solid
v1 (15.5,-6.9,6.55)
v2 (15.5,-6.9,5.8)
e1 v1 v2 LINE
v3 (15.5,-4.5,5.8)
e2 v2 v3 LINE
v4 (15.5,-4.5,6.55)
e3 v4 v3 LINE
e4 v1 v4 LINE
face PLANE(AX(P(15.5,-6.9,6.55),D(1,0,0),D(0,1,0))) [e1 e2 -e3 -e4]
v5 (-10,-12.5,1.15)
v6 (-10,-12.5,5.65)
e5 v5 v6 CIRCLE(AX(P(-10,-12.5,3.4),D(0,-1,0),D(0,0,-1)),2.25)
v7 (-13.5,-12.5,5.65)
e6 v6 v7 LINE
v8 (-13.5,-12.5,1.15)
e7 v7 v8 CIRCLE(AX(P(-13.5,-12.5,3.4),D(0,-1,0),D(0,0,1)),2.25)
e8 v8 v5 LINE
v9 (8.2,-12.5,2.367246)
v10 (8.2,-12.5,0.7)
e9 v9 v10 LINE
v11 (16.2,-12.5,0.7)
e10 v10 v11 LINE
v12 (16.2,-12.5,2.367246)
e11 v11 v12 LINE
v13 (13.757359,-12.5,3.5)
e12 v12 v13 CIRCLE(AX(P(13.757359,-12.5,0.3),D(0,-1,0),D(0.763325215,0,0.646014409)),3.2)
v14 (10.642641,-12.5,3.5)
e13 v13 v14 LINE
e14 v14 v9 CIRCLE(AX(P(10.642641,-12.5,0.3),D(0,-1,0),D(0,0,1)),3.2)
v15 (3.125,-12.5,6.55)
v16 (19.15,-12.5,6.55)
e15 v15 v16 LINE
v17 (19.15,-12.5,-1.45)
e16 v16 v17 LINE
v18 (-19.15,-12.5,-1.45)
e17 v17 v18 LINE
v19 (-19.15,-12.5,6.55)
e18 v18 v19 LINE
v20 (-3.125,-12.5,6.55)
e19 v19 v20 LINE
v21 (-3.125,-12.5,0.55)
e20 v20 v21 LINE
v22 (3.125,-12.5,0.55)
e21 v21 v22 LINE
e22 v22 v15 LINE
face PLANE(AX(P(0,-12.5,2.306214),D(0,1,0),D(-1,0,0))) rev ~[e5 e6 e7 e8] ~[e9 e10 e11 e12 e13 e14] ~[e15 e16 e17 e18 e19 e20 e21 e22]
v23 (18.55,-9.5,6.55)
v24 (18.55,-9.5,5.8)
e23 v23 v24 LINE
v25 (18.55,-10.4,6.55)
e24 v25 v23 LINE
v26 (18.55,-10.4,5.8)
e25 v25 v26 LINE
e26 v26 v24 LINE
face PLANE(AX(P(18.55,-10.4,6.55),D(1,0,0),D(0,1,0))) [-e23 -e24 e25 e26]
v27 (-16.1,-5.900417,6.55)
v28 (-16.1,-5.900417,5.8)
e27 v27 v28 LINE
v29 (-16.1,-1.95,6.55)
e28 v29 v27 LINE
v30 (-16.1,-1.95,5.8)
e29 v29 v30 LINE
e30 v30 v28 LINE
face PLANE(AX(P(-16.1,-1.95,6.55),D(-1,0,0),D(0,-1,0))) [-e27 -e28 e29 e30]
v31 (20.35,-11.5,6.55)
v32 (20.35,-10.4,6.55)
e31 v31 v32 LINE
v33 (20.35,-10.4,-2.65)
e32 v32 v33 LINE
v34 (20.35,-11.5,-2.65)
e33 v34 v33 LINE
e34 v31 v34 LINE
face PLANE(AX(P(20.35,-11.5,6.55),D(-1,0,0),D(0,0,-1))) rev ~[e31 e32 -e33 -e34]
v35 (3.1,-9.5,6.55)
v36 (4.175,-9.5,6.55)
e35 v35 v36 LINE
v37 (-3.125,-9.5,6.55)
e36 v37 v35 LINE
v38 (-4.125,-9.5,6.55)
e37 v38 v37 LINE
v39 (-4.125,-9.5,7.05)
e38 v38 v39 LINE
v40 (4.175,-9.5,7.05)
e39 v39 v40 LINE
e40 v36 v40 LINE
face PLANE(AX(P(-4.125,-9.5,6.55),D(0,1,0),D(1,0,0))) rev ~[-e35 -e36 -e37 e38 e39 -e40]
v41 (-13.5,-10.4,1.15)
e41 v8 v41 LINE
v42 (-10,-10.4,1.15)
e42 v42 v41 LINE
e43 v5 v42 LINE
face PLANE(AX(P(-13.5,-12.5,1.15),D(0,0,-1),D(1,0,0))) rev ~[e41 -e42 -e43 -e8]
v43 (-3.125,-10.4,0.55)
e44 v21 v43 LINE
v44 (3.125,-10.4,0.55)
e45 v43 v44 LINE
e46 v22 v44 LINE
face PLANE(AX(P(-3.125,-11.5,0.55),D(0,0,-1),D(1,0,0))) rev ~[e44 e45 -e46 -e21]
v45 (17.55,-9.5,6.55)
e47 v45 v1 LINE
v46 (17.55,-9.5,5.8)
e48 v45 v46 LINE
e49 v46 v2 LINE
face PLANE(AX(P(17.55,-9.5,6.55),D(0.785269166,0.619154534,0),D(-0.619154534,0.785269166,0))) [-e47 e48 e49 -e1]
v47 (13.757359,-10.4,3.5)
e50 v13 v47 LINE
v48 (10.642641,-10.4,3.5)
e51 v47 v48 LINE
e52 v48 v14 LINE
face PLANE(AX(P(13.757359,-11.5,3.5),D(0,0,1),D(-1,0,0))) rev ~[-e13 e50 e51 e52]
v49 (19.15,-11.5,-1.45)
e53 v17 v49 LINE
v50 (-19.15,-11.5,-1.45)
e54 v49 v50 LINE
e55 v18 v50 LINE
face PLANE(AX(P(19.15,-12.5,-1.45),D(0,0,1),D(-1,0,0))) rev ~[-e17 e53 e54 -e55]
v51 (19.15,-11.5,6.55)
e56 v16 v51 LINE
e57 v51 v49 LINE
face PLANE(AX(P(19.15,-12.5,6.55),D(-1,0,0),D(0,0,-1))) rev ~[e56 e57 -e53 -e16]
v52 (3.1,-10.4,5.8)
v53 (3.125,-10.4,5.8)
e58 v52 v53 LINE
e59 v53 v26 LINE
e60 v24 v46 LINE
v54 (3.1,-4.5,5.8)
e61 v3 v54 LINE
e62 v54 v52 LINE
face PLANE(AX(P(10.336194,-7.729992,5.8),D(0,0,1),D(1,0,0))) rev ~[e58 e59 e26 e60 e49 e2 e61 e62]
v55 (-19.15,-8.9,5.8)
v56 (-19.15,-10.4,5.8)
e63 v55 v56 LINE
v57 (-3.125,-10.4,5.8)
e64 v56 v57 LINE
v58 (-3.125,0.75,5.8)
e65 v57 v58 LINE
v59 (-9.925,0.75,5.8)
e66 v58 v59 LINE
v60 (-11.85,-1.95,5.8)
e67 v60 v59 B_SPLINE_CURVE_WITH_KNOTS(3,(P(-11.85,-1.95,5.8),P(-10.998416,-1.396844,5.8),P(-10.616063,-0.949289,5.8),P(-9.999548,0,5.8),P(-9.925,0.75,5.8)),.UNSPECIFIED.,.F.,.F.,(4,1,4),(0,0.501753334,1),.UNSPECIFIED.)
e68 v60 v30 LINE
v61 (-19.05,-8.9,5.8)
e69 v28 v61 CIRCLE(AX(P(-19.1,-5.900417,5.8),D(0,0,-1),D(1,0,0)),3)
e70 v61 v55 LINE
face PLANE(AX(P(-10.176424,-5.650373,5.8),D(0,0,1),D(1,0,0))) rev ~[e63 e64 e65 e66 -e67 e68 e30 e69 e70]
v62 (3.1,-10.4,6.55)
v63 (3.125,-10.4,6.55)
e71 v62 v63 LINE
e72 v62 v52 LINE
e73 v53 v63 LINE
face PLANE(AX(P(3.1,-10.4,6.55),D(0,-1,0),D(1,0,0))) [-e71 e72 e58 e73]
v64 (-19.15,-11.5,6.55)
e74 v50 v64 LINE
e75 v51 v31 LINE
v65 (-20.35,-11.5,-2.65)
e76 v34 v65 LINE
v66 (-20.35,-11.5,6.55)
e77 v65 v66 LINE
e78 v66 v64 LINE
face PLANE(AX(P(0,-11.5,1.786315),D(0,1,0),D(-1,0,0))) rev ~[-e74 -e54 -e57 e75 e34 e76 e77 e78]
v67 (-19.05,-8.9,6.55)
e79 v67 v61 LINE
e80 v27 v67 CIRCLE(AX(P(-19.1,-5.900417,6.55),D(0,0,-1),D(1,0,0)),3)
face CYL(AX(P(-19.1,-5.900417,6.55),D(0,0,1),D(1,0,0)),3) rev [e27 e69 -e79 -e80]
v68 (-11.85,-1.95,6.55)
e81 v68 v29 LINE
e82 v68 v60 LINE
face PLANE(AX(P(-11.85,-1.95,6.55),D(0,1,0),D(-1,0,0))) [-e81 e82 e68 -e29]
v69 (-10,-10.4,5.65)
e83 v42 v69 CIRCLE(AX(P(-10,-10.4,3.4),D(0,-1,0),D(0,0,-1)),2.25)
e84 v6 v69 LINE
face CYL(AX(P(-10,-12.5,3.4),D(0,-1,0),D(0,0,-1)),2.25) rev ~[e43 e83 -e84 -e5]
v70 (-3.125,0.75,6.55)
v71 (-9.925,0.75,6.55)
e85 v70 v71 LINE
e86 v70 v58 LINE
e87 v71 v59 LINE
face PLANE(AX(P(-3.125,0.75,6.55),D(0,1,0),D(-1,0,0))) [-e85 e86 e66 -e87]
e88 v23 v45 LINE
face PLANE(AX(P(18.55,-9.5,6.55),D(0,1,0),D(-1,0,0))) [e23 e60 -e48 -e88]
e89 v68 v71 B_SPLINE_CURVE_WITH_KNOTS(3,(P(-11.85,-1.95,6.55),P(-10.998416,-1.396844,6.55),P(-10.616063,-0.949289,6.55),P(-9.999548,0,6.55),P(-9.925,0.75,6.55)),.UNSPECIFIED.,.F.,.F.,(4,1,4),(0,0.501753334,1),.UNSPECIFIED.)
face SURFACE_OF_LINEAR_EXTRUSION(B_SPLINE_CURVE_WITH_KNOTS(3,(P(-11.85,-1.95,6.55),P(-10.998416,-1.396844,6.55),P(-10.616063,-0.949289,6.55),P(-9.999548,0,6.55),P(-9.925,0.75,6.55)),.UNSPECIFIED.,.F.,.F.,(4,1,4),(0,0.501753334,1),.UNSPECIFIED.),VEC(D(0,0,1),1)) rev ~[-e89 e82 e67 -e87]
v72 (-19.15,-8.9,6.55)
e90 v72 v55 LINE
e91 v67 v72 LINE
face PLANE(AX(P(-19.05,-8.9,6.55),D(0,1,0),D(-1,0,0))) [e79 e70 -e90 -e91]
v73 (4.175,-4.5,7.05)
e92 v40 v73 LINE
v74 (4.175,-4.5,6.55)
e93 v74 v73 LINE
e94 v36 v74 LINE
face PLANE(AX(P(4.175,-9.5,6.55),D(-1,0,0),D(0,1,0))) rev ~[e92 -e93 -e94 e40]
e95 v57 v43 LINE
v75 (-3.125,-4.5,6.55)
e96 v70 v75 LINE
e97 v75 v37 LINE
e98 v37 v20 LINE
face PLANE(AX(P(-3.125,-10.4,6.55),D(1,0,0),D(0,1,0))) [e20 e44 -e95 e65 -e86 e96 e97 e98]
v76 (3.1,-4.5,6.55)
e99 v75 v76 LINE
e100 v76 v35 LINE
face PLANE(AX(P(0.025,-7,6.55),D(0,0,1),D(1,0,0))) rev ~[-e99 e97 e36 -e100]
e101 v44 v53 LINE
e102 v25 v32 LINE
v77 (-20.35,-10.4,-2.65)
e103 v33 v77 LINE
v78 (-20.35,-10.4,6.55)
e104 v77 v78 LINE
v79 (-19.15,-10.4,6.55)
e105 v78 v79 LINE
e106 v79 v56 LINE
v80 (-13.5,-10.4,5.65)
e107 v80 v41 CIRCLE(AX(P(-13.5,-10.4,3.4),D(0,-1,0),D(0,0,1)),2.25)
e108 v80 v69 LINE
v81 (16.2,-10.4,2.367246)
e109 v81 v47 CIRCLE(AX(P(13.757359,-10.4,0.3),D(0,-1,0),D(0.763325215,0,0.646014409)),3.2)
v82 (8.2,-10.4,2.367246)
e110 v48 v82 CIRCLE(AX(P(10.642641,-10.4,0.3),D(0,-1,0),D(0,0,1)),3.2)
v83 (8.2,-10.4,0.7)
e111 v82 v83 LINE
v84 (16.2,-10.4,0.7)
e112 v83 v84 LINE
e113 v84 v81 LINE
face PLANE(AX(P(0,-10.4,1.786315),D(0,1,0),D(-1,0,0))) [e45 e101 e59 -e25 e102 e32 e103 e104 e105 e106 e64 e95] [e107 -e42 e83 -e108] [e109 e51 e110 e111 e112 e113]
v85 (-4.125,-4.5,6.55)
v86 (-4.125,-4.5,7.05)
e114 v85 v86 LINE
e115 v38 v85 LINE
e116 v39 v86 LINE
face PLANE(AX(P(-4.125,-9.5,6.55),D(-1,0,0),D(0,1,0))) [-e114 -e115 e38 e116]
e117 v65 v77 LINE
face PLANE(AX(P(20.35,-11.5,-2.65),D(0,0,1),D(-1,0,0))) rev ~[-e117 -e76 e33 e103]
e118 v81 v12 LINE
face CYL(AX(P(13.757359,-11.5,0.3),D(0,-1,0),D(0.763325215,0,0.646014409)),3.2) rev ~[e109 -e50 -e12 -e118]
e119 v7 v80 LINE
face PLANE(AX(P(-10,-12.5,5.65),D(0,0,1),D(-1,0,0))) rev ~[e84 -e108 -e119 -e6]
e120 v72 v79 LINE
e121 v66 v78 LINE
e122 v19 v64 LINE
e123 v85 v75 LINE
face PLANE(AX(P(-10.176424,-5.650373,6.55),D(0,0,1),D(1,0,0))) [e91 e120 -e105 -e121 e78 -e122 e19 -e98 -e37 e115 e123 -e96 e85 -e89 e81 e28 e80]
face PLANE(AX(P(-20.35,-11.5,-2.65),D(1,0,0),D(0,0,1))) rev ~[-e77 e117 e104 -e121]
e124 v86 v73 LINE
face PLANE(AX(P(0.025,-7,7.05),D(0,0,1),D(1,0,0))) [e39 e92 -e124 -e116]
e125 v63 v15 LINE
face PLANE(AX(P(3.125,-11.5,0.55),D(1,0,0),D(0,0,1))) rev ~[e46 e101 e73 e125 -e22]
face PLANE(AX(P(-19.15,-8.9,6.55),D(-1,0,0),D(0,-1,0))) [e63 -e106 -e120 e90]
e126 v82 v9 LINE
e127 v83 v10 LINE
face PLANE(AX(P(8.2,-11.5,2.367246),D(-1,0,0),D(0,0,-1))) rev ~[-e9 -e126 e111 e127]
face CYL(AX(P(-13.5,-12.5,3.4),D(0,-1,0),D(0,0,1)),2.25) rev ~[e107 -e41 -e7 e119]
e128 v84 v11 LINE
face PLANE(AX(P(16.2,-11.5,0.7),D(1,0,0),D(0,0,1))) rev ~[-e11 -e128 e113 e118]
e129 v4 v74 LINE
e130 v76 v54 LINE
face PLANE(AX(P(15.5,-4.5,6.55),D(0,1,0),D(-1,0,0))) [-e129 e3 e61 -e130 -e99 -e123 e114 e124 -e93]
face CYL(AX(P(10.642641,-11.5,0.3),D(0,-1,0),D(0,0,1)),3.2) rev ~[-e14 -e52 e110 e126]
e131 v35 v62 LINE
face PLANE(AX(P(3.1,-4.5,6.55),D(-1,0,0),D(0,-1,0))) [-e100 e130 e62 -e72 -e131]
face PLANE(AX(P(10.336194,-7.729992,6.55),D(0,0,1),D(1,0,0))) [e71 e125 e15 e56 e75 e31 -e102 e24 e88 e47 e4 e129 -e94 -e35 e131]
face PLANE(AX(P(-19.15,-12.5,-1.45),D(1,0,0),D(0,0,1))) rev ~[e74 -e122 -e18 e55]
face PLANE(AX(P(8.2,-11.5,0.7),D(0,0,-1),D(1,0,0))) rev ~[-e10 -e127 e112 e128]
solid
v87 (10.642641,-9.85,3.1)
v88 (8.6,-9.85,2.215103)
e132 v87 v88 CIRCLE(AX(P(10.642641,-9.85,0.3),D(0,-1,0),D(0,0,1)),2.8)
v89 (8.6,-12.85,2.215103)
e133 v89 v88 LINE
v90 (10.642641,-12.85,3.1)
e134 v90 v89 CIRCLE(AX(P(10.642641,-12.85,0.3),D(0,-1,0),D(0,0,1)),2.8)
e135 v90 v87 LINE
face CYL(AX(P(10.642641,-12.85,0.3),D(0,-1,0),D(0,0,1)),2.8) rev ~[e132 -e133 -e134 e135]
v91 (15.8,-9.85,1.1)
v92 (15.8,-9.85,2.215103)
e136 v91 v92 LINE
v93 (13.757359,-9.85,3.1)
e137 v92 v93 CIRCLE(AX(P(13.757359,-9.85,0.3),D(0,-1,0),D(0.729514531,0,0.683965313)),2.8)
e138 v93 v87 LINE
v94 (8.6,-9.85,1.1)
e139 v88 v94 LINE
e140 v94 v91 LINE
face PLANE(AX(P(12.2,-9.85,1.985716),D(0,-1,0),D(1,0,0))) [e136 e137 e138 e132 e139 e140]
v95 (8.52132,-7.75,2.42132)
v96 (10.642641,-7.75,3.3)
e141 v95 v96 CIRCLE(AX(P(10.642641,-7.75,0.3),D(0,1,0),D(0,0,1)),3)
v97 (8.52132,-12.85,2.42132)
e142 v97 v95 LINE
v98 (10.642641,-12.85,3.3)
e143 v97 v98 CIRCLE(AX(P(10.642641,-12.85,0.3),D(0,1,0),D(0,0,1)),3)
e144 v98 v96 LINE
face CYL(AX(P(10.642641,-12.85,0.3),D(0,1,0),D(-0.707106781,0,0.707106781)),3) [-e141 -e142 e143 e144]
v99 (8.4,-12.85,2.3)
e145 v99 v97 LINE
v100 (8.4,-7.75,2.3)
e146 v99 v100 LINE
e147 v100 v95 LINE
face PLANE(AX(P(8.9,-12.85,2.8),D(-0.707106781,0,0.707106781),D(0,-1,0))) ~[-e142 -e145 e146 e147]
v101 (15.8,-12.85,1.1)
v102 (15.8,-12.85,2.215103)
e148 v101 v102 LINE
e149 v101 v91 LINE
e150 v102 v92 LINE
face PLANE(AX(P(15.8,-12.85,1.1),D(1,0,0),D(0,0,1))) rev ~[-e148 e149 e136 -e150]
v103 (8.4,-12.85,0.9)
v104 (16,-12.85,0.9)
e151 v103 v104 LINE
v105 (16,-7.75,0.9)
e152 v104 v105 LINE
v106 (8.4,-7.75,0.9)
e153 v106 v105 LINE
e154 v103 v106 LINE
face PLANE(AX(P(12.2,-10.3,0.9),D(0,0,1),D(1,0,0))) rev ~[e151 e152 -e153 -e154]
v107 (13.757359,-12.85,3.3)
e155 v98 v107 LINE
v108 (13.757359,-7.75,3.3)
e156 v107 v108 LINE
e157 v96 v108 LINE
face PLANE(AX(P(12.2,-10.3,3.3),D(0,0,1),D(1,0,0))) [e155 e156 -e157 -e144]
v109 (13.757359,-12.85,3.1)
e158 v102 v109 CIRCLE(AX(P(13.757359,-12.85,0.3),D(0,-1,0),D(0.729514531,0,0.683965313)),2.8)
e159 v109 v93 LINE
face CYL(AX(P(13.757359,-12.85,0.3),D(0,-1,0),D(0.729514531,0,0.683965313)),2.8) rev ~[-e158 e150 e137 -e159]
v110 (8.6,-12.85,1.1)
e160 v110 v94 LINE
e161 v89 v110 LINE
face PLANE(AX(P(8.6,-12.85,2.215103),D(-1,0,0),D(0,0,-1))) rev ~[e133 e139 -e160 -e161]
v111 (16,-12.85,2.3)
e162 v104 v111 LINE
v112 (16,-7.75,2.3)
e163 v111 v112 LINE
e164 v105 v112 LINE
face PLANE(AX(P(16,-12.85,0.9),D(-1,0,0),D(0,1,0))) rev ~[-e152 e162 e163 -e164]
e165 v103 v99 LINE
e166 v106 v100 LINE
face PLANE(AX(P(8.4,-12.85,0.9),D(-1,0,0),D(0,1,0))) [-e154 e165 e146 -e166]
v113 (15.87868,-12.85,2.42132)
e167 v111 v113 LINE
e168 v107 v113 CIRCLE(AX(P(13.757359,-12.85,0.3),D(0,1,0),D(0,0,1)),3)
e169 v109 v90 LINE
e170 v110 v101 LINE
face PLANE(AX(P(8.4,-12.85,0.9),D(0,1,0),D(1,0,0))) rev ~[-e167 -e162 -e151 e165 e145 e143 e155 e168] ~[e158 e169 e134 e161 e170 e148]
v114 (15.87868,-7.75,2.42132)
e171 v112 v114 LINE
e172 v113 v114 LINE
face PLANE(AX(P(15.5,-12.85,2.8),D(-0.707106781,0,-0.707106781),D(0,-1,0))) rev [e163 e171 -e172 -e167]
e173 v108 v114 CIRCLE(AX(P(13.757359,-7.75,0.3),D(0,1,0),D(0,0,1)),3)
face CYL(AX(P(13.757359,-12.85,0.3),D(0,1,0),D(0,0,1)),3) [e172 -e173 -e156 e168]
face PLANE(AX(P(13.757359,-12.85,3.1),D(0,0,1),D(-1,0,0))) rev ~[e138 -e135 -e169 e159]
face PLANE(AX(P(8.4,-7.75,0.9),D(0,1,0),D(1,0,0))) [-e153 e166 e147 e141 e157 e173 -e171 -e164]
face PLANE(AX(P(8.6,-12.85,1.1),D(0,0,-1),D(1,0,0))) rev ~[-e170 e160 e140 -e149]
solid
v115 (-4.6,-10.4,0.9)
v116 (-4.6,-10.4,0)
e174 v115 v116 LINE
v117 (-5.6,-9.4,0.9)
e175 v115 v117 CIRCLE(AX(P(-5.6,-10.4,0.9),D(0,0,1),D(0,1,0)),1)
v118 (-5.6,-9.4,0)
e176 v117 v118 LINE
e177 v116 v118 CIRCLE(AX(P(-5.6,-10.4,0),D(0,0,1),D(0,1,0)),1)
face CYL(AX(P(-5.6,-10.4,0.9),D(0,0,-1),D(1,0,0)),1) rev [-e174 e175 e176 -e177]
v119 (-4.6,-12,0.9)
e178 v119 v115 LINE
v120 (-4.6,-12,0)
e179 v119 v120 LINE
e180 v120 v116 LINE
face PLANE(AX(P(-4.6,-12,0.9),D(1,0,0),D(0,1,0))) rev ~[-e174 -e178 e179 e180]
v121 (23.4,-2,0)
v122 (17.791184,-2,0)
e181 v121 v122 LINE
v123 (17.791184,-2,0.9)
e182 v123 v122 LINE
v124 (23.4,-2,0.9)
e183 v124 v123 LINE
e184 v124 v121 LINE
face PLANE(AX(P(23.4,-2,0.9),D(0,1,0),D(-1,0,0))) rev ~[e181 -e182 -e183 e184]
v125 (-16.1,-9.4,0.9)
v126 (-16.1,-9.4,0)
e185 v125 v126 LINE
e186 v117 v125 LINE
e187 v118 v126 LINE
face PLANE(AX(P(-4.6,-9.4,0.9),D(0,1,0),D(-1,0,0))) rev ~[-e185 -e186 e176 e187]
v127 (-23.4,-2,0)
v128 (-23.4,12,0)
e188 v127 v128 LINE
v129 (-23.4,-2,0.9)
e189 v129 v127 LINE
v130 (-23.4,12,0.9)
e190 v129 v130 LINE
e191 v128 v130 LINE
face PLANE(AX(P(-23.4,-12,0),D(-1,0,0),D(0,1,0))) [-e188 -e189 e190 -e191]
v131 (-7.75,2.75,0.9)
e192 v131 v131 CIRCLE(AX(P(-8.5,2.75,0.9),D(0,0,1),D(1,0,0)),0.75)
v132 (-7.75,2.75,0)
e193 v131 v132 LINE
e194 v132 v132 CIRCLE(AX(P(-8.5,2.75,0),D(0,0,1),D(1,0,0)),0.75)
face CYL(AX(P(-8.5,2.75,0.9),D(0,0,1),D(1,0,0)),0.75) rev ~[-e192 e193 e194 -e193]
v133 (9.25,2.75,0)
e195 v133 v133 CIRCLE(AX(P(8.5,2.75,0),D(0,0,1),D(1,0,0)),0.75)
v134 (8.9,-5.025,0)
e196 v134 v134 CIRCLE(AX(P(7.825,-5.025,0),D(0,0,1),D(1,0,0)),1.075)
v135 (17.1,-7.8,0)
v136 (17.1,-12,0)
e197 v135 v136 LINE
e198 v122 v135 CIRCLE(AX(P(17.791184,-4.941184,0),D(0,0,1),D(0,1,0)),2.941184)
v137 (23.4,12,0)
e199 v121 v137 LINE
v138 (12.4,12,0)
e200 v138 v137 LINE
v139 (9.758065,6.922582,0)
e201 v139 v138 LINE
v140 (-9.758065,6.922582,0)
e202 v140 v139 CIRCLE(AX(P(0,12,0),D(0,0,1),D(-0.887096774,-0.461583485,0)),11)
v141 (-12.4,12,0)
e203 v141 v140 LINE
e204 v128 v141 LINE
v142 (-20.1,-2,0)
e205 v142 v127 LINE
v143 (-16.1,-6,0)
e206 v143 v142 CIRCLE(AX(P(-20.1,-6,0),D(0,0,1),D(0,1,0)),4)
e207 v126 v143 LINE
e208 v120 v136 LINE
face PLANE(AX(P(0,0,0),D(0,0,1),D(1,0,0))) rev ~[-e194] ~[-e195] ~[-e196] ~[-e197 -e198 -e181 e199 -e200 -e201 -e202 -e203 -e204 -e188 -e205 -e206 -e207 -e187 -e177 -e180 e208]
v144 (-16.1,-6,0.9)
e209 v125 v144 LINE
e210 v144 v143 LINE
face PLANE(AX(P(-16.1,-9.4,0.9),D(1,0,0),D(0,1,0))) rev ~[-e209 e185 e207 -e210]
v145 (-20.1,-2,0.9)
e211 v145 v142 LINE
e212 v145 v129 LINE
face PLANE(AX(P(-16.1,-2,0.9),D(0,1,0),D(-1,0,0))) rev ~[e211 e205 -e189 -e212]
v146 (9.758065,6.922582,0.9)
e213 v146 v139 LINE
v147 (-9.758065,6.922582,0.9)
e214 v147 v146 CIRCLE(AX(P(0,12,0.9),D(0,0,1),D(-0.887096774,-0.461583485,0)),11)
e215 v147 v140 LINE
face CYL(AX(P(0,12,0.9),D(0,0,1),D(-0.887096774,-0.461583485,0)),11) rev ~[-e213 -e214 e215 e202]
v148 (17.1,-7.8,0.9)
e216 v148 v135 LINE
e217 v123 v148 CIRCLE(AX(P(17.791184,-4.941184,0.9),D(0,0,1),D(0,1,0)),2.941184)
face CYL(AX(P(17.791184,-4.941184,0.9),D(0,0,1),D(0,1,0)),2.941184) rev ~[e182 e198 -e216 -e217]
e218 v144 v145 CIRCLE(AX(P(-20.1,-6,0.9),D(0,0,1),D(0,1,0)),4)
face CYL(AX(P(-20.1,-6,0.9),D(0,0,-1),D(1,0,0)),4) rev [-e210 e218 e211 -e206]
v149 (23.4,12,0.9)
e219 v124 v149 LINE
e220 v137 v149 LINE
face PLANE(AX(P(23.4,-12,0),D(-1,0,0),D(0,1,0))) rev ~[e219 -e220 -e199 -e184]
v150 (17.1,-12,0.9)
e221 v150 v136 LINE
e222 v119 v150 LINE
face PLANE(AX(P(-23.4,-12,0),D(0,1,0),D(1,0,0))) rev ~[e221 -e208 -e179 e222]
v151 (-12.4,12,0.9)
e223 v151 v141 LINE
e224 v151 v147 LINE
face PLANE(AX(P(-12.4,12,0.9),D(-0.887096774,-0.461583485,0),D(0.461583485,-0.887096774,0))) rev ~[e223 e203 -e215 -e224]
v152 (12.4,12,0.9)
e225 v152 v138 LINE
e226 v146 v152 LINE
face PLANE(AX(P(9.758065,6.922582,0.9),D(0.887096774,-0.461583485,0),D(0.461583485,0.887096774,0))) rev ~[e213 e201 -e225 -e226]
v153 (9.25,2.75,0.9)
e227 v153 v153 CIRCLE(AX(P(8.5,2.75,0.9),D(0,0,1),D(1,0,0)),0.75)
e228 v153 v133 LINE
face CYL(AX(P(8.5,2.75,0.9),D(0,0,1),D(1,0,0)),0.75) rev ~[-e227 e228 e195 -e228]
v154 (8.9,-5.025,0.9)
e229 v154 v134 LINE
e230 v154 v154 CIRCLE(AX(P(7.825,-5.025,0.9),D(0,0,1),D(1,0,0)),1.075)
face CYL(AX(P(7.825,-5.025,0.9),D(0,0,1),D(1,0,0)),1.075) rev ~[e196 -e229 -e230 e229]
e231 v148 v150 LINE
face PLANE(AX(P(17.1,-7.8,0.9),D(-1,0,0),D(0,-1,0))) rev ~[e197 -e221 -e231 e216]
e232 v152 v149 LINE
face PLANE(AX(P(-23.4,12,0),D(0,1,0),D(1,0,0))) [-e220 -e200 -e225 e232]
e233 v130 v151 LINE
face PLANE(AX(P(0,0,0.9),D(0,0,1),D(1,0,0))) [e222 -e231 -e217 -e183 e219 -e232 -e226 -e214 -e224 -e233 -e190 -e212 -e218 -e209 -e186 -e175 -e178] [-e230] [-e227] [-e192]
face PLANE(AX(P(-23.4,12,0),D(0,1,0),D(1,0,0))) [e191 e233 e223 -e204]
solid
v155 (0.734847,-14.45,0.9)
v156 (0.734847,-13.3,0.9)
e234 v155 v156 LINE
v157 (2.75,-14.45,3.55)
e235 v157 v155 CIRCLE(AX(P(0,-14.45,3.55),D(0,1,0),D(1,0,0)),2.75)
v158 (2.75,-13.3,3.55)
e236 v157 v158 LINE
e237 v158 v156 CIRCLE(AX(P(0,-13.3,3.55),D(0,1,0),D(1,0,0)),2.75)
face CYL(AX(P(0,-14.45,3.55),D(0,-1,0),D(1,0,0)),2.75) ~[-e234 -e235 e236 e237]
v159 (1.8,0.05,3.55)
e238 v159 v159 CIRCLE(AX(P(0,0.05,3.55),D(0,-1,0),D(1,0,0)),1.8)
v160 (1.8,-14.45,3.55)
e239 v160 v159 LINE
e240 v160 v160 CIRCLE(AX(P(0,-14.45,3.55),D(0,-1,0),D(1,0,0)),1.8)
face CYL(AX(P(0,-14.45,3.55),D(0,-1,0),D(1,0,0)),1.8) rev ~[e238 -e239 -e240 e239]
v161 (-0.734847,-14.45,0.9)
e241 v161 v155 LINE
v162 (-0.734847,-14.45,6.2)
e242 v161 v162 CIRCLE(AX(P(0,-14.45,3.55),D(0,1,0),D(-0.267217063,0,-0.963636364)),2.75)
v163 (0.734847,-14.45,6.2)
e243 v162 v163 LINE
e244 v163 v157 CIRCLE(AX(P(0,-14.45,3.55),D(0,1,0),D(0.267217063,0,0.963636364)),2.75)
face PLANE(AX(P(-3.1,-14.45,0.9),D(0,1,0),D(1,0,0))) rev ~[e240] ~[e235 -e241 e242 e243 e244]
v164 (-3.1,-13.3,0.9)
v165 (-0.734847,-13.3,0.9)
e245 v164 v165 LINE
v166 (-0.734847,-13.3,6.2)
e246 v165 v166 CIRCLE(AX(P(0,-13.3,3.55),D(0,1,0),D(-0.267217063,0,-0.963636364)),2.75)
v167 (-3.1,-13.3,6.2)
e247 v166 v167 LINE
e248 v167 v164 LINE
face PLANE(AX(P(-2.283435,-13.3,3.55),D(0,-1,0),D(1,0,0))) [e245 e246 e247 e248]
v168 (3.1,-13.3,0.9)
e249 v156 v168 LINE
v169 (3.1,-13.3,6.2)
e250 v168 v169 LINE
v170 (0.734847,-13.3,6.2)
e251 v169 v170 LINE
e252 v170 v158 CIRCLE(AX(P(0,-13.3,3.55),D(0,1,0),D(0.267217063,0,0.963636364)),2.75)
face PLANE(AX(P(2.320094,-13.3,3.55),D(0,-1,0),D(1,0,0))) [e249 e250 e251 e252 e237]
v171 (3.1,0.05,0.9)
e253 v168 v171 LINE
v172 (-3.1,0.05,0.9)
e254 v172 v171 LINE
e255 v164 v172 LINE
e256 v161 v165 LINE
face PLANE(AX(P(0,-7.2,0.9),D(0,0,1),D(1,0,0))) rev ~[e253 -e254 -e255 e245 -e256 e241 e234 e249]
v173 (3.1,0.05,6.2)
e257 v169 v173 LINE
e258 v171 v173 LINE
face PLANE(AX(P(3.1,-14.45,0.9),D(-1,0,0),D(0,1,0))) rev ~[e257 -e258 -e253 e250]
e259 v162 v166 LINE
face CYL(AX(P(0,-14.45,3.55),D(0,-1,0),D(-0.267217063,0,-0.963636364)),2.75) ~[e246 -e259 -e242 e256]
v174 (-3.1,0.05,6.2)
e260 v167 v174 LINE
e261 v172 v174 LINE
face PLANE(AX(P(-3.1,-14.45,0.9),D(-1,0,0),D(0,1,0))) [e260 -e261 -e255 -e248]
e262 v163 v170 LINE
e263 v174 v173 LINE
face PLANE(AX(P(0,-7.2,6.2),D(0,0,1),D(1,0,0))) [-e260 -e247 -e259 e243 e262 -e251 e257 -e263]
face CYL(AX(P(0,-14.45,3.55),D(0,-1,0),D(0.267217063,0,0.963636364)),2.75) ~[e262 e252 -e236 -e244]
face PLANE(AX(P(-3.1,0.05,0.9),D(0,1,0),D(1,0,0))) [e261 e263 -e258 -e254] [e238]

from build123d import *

# Parameters (mm, degrees)
F0_W      = 46.8
F0_H      = 24
F1_DEPTH  = 0.9
F3_DEPTH  = 25
F4_R      = 1
F5_R      = 4
F6_R      = 0.75
F7_DEPTH  = 25
F8_R      = 1.075
F9_DEPTH  = 25
F10_W     = 7.6
F10_H     = 5.1
F11_DEPTH = 2.4
F12_SIZE  = 1
F13_R     = 3
F15_DEPTH = 3
F16_W     = 6.2
F16_H     = 14.5
F17_DEPTH = 5.3
F18_R     = 1.8
F19_DEPTH = 14.5
F20_R     = 1.8
F21_DEPTH = 1.15
F24_DEPTH = 1
F26_DEPTH = 1.1
F28_DEPTH = 0.75
F29_W     = 8.3
F29_H     = 5
F30_DEPTH = 0.5
F32_DEPTH = 0.75
F34_DEPTH = 25


with BuildPart() as f1:
    # F0 (on Top) → F1 (new body)
    with BuildSketch(Plane.XY):
        Rectangle(F0_W, F0_H)
    extrude(amount=F1_DEPTH)

    # F2 (on face) → F3 (cut)
    with BuildSketch(Plane.XY.offset(0.9)):
        Polygon((-16.1, -2), (-23.4, -2), (-23.4, -12), (-16.1, -12), (-4.6, -12), (-4.6, -9.4), (-16.1, -9.4), align=None)
        with BuildLine():
            Line((-12.4, 12), (-9.7580645161, 6.9225816699))
            ThreePointArc((-9.7580645161, 6.9225816699), (0, 1), (9.7580645161, 6.9225816699))
            Line((9.7580645161, 6.9225816699), (12.4, 12))
            Line((12.4, 12), (-12.4, 12))
        make_face()
        with BuildLine():
            Line((17.1, -12), (23.4, -12))
            Line((23.4, -12), (23.4, -2))
            Line((23.4, -2), (17.7911840902, -2))
            ThreePointArc((17.7911840902, -2), (14.8706646396, -4.5931467489), (17.1, -7.8))
            Line((17.1, -7.8), (17.1, -12))
        make_face()
    extrude(amount=-F3_DEPTH, mode=Mode.SUBTRACT)

    # F4
    f4_edges = [f1.edges().sort_by_distance(p)[0] for p in [
        (-4.6, -9.4, 0.45),
    ]]
    fillet(f4_edges, radius=F4_R)

    # F5
    f5_edges = [f1.edges().sort_by_distance(p)[0] for p in [
        (-16.1, -2, 0.45),
    ]]
    fillet(f5_edges, radius=F5_R)

    # F6 (on face) → F7 (cut)
    with BuildSketch(Plane.XY.offset(0.9)):
        with Locations((-8.5, 2.75)):
            Circle(F6_R)
        with Locations((8.5, 2.75)):
            Circle(F6_R)
    extrude(amount=-F7_DEPTH, mode=Mode.SUBTRACT)

    # F8 (on face) → F9 (cut)
    with BuildSketch(Plane.XY.offset(0.9)):
        with Locations((7.825, -5.025)):
            Circle(F8_R)
    extrude(amount=-F9_DEPTH, mode=Mode.SUBTRACT)


with BuildPart() as f11:
    # F10 (on face) → F11 (new body)
    with BuildSketch(Plane.XY.offset(0.9)):
        with Locations((12.2, -10.3)):
            Rectangle(F10_W, F10_H)
    extrude(amount=F11_DEPTH)

    # F12
    f12_edges = [f11.edges().sort_by_distance(p)[0] for p in [
        (8.4, -10.3, 3.3),
        (16, -10.3, 3.3),
    ]]
    chamfer(f12_edges, length=F12_SIZE)

    # F13
    f13_edges = [f11.edges().sort_by_distance(p)[0] for p in [
        (9.4, -10.3, 3.3),
        (15, -10.3, 3.3),
    ]]
    fillet(f13_edges, radius=F13_R)

    # F14 (on face) → F15 (cut)
    with BuildSketch(Plane.XZ.offset(12.85)):
        with BuildLine():
            Line((13.7573593129, 3.1), (10.6426406871, 3.1))
            ThreePointArc((10.6426406871, 3.1), (9.5296016157, 2.8692691618), (8.6, 2.2151028754))
            Line((8.6, 2.2151028754), (8.6, 1.1))
            Line((8.6, 1.1), (15.8, 1.1))
            Line((15.8, 1.1), (15.8, 2.2151028754))
            ThreePointArc((15.8, 2.2151028754), (14.8703983843, 2.8692691618), (13.7573593129, 3.1))
        make_face()
    extrude(amount=-F15_DEPTH, mode=Mode.SUBTRACT)


with BuildPart() as f17:
    # F16 (on face) → F17 (new body)
    with BuildSketch(Plane.XY.offset(0.9)):
        with Locations((0, -7.2)):
            Rectangle(F16_W, F16_H)
    extrude(amount=F17_DEPTH)

    # F18 (on face) → F19 (cut, through all)
    with BuildSketch(Plane.XZ.offset(14.45)):
        with Locations((0, 3.55)):
            Circle(F18_R)
    extrude(amount=-F19_DEPTH, mode=Mode.SUBTRACT)

    # F20 (on face) → F21 (cut)
    with BuildSketch(Plane.XZ.offset(14.45)):
        with Locations((0, 3.55)):
            Circle(F20_R)
        with BuildLine():
            Line((-0.7348469228, 6.2), (0.7348469228, 6.2))
            ThreePointArc((0.7348469228, 6.2), (0, 6.3), (-0.7348469228, 6.2))
        make_face()
        with BuildLine():
            ThreePointArc((-0.7348469228, 0.9), (0, 0.8), (0.7348469228, 0.9))
            Line((0.7348469228, 0.9), (-0.7348469228, 0.9))
        make_face()
        with BuildLine():
            ThreePointArc((-0.7348469228, 0.9), (-2.75, 3.55), (-0.7348469228, 6.2))
            Line((-0.7348469228, 6.2), (-3.1, 6.2))
            Line((-3.1, 6.2), (-3.1, 0.9))
            Line((-3.1, 0.9), (-0.7348469228, 0.9))
        make_face()
        with BuildLine():
            ThreePointArc((0.7348469228, 6.2), (2.1889870988, 5.2145826748), (2.75, 3.55))
            ThreePointArc((2.75, 3.55), (2.1889870988, 1.8854173252), (0.7348469228, 0.9))
            Line((0.7348469228, 0.9), (3.1, 0.9))
            Line((3.1, 0.9), (3.1, 6.2))
            Line((3.1, 6.2), (0.7348469228, 6.2))
        make_face()
    extrude(amount=-F21_DEPTH, mode=Mode.SUBTRACT)


with BuildPart() as f24:
    # F23 (on offset) → F24 (new body)
    with BuildSketch(Plane(origin=(0, -12.5, 0), x_dir=(-1, 0, 0), z_dir=(0, 1, 0))):
        Polygon((19.15, -1.45), (19.15, 6.55), (3.125, 6.55), (3.125, 0.55), (-3.125, 0.55), (-3.125, 6.55), (-19.15, 6.55), (-19.15, -1.45), align=None)
        with BuildLine():
            Line((-16.2, 0.7), (-16.2, 2.3672461086))
            ThreePointArc((-16.2, 2.3672461086), (-15.1036156875, 3.2030318245), (-13.7573593129, 3.5))
            Line((-13.7573593129, 3.5), (-10.6426406871, 3.5))
            ThreePointArc((-10.6426406871, 3.5), (-9.2963843125, 3.2030318245), (-8.2, 2.3672461086))
            Line((-8.2, 2.3672461086), (-8.2, 0.7))
            Line((-8.2, 0.7), (-16.2, 0.7))
        make_face(mode=Mode.SUBTRACT)
    extrude(amount=F24_DEPTH)

    # F25 (on face) → F26 (join)
    with BuildSketch(Plane(origin=(0, -11.5, 0), x_dir=(-1, 0, 0), z_dir=(0, 1, 0))):
        Polygon((20.35, -2.65), (20.35, 6.55), (3.125, 6.55), (3.125, 0.55), (-3.125, 0.55), (-3.125, 6.55), (-20.35, 6.55), (-20.35, -2.65), align=None)
        with BuildLine():
            Line((-13.7573593129, 3.5), (-10.6426406871, 3.5))
            ThreePointArc((-10.6426406871, 3.5), (-9.2963843125, 3.2030318245), (-8.2, 2.3672461086))
            Line((-8.2, 2.3672461086), (-8.2, 0.7))
            Line((-8.2, 0.7), (-16.2, 0.7))
            Line((-16.2, 0.7), (-16.2, 2.3672461086))
            ThreePointArc((-16.2, 2.3672461086), (-15.1036156875, 3.2030318245), (-13.7573593129, 3.5))
        make_face(mode=Mode.SUBTRACT)
    extrude(amount=F26_DEPTH)

    # F27 (on face) → F28 (join)
    with BuildSketch(Plane.XY.offset(6.55)):
        with BuildLine():
            Line((-19.15, -10.4), (-3.125, -10.4))
            Line((-3.125, -10.4), (-3.125, 0.75))
            Line((-3.125, 0.75), (-9.925, 0.75))
            add(Edge.make_bspline(
                [(-11.85, -1.95), (-10.9984157607, -1.39684428), (-10.6160626022, -0.9492889302), (-9.9995483018, 0), (-9.925, 0.75)],
                knots=[0, 0, 0, 0, 0.5017533344, 1, 1, 1, 1], degree=3))
            Line((-11.85, -1.95), (-16.1, -1.95))
            Line((-16.1, -1.95), (-16.1, -5.9004166956))
            ThreePointArc((-16.1, -5.9004166956), (-16.9610750364, -8.0039850924), (-19.05, -8.9))
            ThreePointArc((-19.05, -8.9), (-19.1, -8.9004166956), (-19.15, -8.9))
            Line((-19.15, -8.9), (-19.15, -10.4))
        make_face()
        with BuildLine():
            Line((-19.05, -8.9), (-19.15, -8.9))
            ThreePointArc((-19.15, -8.9), (-19.1, -8.9004166956), (-19.05, -8.9))
        make_face()
    extrude(amount=-F28_DEPTH)

    # F29 (on face) → F30 (join)
    with BuildSketch(Plane.XY.offset(6.55)):
        with Locations((0.025, -7)):
            Rectangle(F29_W, F29_H)
    extrude(amount=F30_DEPTH)

    # F31 (on face) → F32 (join, through all)
    with BuildSketch(Plane.XY.offset(6.55)):
        Polygon((15.5, -4.5), (3.1, -4.5), (3.1, -10.4), (15.5, -10.4), (18.55, -10.4), (18.55, -9.5), (17.55, -9.5), (15.5, -6.9), align=None)
    extrude(amount=-F32_DEPTH)

    # F33 (on face) → F34 (cut)
    with BuildSketch(Plane.XZ.offset(12.5)):
        with BuildLine():
            Line((-10, 5.65), (-13.5, 5.65))
            ThreePointArc((-13.5, 5.65), (-15.75, 3.4), (-13.5, 1.15))
            Line((-13.5, 1.15), (-10, 1.15))
            ThreePointArc((-10, 1.15), (-7.75, 3.4), (-10, 5.65))
        make_face()
    extrude(amount=-F34_DEPTH, mode=Mode.SUBTRACT)


solid = Compound([f1.part, f11.part, f17.part, f24.part])
